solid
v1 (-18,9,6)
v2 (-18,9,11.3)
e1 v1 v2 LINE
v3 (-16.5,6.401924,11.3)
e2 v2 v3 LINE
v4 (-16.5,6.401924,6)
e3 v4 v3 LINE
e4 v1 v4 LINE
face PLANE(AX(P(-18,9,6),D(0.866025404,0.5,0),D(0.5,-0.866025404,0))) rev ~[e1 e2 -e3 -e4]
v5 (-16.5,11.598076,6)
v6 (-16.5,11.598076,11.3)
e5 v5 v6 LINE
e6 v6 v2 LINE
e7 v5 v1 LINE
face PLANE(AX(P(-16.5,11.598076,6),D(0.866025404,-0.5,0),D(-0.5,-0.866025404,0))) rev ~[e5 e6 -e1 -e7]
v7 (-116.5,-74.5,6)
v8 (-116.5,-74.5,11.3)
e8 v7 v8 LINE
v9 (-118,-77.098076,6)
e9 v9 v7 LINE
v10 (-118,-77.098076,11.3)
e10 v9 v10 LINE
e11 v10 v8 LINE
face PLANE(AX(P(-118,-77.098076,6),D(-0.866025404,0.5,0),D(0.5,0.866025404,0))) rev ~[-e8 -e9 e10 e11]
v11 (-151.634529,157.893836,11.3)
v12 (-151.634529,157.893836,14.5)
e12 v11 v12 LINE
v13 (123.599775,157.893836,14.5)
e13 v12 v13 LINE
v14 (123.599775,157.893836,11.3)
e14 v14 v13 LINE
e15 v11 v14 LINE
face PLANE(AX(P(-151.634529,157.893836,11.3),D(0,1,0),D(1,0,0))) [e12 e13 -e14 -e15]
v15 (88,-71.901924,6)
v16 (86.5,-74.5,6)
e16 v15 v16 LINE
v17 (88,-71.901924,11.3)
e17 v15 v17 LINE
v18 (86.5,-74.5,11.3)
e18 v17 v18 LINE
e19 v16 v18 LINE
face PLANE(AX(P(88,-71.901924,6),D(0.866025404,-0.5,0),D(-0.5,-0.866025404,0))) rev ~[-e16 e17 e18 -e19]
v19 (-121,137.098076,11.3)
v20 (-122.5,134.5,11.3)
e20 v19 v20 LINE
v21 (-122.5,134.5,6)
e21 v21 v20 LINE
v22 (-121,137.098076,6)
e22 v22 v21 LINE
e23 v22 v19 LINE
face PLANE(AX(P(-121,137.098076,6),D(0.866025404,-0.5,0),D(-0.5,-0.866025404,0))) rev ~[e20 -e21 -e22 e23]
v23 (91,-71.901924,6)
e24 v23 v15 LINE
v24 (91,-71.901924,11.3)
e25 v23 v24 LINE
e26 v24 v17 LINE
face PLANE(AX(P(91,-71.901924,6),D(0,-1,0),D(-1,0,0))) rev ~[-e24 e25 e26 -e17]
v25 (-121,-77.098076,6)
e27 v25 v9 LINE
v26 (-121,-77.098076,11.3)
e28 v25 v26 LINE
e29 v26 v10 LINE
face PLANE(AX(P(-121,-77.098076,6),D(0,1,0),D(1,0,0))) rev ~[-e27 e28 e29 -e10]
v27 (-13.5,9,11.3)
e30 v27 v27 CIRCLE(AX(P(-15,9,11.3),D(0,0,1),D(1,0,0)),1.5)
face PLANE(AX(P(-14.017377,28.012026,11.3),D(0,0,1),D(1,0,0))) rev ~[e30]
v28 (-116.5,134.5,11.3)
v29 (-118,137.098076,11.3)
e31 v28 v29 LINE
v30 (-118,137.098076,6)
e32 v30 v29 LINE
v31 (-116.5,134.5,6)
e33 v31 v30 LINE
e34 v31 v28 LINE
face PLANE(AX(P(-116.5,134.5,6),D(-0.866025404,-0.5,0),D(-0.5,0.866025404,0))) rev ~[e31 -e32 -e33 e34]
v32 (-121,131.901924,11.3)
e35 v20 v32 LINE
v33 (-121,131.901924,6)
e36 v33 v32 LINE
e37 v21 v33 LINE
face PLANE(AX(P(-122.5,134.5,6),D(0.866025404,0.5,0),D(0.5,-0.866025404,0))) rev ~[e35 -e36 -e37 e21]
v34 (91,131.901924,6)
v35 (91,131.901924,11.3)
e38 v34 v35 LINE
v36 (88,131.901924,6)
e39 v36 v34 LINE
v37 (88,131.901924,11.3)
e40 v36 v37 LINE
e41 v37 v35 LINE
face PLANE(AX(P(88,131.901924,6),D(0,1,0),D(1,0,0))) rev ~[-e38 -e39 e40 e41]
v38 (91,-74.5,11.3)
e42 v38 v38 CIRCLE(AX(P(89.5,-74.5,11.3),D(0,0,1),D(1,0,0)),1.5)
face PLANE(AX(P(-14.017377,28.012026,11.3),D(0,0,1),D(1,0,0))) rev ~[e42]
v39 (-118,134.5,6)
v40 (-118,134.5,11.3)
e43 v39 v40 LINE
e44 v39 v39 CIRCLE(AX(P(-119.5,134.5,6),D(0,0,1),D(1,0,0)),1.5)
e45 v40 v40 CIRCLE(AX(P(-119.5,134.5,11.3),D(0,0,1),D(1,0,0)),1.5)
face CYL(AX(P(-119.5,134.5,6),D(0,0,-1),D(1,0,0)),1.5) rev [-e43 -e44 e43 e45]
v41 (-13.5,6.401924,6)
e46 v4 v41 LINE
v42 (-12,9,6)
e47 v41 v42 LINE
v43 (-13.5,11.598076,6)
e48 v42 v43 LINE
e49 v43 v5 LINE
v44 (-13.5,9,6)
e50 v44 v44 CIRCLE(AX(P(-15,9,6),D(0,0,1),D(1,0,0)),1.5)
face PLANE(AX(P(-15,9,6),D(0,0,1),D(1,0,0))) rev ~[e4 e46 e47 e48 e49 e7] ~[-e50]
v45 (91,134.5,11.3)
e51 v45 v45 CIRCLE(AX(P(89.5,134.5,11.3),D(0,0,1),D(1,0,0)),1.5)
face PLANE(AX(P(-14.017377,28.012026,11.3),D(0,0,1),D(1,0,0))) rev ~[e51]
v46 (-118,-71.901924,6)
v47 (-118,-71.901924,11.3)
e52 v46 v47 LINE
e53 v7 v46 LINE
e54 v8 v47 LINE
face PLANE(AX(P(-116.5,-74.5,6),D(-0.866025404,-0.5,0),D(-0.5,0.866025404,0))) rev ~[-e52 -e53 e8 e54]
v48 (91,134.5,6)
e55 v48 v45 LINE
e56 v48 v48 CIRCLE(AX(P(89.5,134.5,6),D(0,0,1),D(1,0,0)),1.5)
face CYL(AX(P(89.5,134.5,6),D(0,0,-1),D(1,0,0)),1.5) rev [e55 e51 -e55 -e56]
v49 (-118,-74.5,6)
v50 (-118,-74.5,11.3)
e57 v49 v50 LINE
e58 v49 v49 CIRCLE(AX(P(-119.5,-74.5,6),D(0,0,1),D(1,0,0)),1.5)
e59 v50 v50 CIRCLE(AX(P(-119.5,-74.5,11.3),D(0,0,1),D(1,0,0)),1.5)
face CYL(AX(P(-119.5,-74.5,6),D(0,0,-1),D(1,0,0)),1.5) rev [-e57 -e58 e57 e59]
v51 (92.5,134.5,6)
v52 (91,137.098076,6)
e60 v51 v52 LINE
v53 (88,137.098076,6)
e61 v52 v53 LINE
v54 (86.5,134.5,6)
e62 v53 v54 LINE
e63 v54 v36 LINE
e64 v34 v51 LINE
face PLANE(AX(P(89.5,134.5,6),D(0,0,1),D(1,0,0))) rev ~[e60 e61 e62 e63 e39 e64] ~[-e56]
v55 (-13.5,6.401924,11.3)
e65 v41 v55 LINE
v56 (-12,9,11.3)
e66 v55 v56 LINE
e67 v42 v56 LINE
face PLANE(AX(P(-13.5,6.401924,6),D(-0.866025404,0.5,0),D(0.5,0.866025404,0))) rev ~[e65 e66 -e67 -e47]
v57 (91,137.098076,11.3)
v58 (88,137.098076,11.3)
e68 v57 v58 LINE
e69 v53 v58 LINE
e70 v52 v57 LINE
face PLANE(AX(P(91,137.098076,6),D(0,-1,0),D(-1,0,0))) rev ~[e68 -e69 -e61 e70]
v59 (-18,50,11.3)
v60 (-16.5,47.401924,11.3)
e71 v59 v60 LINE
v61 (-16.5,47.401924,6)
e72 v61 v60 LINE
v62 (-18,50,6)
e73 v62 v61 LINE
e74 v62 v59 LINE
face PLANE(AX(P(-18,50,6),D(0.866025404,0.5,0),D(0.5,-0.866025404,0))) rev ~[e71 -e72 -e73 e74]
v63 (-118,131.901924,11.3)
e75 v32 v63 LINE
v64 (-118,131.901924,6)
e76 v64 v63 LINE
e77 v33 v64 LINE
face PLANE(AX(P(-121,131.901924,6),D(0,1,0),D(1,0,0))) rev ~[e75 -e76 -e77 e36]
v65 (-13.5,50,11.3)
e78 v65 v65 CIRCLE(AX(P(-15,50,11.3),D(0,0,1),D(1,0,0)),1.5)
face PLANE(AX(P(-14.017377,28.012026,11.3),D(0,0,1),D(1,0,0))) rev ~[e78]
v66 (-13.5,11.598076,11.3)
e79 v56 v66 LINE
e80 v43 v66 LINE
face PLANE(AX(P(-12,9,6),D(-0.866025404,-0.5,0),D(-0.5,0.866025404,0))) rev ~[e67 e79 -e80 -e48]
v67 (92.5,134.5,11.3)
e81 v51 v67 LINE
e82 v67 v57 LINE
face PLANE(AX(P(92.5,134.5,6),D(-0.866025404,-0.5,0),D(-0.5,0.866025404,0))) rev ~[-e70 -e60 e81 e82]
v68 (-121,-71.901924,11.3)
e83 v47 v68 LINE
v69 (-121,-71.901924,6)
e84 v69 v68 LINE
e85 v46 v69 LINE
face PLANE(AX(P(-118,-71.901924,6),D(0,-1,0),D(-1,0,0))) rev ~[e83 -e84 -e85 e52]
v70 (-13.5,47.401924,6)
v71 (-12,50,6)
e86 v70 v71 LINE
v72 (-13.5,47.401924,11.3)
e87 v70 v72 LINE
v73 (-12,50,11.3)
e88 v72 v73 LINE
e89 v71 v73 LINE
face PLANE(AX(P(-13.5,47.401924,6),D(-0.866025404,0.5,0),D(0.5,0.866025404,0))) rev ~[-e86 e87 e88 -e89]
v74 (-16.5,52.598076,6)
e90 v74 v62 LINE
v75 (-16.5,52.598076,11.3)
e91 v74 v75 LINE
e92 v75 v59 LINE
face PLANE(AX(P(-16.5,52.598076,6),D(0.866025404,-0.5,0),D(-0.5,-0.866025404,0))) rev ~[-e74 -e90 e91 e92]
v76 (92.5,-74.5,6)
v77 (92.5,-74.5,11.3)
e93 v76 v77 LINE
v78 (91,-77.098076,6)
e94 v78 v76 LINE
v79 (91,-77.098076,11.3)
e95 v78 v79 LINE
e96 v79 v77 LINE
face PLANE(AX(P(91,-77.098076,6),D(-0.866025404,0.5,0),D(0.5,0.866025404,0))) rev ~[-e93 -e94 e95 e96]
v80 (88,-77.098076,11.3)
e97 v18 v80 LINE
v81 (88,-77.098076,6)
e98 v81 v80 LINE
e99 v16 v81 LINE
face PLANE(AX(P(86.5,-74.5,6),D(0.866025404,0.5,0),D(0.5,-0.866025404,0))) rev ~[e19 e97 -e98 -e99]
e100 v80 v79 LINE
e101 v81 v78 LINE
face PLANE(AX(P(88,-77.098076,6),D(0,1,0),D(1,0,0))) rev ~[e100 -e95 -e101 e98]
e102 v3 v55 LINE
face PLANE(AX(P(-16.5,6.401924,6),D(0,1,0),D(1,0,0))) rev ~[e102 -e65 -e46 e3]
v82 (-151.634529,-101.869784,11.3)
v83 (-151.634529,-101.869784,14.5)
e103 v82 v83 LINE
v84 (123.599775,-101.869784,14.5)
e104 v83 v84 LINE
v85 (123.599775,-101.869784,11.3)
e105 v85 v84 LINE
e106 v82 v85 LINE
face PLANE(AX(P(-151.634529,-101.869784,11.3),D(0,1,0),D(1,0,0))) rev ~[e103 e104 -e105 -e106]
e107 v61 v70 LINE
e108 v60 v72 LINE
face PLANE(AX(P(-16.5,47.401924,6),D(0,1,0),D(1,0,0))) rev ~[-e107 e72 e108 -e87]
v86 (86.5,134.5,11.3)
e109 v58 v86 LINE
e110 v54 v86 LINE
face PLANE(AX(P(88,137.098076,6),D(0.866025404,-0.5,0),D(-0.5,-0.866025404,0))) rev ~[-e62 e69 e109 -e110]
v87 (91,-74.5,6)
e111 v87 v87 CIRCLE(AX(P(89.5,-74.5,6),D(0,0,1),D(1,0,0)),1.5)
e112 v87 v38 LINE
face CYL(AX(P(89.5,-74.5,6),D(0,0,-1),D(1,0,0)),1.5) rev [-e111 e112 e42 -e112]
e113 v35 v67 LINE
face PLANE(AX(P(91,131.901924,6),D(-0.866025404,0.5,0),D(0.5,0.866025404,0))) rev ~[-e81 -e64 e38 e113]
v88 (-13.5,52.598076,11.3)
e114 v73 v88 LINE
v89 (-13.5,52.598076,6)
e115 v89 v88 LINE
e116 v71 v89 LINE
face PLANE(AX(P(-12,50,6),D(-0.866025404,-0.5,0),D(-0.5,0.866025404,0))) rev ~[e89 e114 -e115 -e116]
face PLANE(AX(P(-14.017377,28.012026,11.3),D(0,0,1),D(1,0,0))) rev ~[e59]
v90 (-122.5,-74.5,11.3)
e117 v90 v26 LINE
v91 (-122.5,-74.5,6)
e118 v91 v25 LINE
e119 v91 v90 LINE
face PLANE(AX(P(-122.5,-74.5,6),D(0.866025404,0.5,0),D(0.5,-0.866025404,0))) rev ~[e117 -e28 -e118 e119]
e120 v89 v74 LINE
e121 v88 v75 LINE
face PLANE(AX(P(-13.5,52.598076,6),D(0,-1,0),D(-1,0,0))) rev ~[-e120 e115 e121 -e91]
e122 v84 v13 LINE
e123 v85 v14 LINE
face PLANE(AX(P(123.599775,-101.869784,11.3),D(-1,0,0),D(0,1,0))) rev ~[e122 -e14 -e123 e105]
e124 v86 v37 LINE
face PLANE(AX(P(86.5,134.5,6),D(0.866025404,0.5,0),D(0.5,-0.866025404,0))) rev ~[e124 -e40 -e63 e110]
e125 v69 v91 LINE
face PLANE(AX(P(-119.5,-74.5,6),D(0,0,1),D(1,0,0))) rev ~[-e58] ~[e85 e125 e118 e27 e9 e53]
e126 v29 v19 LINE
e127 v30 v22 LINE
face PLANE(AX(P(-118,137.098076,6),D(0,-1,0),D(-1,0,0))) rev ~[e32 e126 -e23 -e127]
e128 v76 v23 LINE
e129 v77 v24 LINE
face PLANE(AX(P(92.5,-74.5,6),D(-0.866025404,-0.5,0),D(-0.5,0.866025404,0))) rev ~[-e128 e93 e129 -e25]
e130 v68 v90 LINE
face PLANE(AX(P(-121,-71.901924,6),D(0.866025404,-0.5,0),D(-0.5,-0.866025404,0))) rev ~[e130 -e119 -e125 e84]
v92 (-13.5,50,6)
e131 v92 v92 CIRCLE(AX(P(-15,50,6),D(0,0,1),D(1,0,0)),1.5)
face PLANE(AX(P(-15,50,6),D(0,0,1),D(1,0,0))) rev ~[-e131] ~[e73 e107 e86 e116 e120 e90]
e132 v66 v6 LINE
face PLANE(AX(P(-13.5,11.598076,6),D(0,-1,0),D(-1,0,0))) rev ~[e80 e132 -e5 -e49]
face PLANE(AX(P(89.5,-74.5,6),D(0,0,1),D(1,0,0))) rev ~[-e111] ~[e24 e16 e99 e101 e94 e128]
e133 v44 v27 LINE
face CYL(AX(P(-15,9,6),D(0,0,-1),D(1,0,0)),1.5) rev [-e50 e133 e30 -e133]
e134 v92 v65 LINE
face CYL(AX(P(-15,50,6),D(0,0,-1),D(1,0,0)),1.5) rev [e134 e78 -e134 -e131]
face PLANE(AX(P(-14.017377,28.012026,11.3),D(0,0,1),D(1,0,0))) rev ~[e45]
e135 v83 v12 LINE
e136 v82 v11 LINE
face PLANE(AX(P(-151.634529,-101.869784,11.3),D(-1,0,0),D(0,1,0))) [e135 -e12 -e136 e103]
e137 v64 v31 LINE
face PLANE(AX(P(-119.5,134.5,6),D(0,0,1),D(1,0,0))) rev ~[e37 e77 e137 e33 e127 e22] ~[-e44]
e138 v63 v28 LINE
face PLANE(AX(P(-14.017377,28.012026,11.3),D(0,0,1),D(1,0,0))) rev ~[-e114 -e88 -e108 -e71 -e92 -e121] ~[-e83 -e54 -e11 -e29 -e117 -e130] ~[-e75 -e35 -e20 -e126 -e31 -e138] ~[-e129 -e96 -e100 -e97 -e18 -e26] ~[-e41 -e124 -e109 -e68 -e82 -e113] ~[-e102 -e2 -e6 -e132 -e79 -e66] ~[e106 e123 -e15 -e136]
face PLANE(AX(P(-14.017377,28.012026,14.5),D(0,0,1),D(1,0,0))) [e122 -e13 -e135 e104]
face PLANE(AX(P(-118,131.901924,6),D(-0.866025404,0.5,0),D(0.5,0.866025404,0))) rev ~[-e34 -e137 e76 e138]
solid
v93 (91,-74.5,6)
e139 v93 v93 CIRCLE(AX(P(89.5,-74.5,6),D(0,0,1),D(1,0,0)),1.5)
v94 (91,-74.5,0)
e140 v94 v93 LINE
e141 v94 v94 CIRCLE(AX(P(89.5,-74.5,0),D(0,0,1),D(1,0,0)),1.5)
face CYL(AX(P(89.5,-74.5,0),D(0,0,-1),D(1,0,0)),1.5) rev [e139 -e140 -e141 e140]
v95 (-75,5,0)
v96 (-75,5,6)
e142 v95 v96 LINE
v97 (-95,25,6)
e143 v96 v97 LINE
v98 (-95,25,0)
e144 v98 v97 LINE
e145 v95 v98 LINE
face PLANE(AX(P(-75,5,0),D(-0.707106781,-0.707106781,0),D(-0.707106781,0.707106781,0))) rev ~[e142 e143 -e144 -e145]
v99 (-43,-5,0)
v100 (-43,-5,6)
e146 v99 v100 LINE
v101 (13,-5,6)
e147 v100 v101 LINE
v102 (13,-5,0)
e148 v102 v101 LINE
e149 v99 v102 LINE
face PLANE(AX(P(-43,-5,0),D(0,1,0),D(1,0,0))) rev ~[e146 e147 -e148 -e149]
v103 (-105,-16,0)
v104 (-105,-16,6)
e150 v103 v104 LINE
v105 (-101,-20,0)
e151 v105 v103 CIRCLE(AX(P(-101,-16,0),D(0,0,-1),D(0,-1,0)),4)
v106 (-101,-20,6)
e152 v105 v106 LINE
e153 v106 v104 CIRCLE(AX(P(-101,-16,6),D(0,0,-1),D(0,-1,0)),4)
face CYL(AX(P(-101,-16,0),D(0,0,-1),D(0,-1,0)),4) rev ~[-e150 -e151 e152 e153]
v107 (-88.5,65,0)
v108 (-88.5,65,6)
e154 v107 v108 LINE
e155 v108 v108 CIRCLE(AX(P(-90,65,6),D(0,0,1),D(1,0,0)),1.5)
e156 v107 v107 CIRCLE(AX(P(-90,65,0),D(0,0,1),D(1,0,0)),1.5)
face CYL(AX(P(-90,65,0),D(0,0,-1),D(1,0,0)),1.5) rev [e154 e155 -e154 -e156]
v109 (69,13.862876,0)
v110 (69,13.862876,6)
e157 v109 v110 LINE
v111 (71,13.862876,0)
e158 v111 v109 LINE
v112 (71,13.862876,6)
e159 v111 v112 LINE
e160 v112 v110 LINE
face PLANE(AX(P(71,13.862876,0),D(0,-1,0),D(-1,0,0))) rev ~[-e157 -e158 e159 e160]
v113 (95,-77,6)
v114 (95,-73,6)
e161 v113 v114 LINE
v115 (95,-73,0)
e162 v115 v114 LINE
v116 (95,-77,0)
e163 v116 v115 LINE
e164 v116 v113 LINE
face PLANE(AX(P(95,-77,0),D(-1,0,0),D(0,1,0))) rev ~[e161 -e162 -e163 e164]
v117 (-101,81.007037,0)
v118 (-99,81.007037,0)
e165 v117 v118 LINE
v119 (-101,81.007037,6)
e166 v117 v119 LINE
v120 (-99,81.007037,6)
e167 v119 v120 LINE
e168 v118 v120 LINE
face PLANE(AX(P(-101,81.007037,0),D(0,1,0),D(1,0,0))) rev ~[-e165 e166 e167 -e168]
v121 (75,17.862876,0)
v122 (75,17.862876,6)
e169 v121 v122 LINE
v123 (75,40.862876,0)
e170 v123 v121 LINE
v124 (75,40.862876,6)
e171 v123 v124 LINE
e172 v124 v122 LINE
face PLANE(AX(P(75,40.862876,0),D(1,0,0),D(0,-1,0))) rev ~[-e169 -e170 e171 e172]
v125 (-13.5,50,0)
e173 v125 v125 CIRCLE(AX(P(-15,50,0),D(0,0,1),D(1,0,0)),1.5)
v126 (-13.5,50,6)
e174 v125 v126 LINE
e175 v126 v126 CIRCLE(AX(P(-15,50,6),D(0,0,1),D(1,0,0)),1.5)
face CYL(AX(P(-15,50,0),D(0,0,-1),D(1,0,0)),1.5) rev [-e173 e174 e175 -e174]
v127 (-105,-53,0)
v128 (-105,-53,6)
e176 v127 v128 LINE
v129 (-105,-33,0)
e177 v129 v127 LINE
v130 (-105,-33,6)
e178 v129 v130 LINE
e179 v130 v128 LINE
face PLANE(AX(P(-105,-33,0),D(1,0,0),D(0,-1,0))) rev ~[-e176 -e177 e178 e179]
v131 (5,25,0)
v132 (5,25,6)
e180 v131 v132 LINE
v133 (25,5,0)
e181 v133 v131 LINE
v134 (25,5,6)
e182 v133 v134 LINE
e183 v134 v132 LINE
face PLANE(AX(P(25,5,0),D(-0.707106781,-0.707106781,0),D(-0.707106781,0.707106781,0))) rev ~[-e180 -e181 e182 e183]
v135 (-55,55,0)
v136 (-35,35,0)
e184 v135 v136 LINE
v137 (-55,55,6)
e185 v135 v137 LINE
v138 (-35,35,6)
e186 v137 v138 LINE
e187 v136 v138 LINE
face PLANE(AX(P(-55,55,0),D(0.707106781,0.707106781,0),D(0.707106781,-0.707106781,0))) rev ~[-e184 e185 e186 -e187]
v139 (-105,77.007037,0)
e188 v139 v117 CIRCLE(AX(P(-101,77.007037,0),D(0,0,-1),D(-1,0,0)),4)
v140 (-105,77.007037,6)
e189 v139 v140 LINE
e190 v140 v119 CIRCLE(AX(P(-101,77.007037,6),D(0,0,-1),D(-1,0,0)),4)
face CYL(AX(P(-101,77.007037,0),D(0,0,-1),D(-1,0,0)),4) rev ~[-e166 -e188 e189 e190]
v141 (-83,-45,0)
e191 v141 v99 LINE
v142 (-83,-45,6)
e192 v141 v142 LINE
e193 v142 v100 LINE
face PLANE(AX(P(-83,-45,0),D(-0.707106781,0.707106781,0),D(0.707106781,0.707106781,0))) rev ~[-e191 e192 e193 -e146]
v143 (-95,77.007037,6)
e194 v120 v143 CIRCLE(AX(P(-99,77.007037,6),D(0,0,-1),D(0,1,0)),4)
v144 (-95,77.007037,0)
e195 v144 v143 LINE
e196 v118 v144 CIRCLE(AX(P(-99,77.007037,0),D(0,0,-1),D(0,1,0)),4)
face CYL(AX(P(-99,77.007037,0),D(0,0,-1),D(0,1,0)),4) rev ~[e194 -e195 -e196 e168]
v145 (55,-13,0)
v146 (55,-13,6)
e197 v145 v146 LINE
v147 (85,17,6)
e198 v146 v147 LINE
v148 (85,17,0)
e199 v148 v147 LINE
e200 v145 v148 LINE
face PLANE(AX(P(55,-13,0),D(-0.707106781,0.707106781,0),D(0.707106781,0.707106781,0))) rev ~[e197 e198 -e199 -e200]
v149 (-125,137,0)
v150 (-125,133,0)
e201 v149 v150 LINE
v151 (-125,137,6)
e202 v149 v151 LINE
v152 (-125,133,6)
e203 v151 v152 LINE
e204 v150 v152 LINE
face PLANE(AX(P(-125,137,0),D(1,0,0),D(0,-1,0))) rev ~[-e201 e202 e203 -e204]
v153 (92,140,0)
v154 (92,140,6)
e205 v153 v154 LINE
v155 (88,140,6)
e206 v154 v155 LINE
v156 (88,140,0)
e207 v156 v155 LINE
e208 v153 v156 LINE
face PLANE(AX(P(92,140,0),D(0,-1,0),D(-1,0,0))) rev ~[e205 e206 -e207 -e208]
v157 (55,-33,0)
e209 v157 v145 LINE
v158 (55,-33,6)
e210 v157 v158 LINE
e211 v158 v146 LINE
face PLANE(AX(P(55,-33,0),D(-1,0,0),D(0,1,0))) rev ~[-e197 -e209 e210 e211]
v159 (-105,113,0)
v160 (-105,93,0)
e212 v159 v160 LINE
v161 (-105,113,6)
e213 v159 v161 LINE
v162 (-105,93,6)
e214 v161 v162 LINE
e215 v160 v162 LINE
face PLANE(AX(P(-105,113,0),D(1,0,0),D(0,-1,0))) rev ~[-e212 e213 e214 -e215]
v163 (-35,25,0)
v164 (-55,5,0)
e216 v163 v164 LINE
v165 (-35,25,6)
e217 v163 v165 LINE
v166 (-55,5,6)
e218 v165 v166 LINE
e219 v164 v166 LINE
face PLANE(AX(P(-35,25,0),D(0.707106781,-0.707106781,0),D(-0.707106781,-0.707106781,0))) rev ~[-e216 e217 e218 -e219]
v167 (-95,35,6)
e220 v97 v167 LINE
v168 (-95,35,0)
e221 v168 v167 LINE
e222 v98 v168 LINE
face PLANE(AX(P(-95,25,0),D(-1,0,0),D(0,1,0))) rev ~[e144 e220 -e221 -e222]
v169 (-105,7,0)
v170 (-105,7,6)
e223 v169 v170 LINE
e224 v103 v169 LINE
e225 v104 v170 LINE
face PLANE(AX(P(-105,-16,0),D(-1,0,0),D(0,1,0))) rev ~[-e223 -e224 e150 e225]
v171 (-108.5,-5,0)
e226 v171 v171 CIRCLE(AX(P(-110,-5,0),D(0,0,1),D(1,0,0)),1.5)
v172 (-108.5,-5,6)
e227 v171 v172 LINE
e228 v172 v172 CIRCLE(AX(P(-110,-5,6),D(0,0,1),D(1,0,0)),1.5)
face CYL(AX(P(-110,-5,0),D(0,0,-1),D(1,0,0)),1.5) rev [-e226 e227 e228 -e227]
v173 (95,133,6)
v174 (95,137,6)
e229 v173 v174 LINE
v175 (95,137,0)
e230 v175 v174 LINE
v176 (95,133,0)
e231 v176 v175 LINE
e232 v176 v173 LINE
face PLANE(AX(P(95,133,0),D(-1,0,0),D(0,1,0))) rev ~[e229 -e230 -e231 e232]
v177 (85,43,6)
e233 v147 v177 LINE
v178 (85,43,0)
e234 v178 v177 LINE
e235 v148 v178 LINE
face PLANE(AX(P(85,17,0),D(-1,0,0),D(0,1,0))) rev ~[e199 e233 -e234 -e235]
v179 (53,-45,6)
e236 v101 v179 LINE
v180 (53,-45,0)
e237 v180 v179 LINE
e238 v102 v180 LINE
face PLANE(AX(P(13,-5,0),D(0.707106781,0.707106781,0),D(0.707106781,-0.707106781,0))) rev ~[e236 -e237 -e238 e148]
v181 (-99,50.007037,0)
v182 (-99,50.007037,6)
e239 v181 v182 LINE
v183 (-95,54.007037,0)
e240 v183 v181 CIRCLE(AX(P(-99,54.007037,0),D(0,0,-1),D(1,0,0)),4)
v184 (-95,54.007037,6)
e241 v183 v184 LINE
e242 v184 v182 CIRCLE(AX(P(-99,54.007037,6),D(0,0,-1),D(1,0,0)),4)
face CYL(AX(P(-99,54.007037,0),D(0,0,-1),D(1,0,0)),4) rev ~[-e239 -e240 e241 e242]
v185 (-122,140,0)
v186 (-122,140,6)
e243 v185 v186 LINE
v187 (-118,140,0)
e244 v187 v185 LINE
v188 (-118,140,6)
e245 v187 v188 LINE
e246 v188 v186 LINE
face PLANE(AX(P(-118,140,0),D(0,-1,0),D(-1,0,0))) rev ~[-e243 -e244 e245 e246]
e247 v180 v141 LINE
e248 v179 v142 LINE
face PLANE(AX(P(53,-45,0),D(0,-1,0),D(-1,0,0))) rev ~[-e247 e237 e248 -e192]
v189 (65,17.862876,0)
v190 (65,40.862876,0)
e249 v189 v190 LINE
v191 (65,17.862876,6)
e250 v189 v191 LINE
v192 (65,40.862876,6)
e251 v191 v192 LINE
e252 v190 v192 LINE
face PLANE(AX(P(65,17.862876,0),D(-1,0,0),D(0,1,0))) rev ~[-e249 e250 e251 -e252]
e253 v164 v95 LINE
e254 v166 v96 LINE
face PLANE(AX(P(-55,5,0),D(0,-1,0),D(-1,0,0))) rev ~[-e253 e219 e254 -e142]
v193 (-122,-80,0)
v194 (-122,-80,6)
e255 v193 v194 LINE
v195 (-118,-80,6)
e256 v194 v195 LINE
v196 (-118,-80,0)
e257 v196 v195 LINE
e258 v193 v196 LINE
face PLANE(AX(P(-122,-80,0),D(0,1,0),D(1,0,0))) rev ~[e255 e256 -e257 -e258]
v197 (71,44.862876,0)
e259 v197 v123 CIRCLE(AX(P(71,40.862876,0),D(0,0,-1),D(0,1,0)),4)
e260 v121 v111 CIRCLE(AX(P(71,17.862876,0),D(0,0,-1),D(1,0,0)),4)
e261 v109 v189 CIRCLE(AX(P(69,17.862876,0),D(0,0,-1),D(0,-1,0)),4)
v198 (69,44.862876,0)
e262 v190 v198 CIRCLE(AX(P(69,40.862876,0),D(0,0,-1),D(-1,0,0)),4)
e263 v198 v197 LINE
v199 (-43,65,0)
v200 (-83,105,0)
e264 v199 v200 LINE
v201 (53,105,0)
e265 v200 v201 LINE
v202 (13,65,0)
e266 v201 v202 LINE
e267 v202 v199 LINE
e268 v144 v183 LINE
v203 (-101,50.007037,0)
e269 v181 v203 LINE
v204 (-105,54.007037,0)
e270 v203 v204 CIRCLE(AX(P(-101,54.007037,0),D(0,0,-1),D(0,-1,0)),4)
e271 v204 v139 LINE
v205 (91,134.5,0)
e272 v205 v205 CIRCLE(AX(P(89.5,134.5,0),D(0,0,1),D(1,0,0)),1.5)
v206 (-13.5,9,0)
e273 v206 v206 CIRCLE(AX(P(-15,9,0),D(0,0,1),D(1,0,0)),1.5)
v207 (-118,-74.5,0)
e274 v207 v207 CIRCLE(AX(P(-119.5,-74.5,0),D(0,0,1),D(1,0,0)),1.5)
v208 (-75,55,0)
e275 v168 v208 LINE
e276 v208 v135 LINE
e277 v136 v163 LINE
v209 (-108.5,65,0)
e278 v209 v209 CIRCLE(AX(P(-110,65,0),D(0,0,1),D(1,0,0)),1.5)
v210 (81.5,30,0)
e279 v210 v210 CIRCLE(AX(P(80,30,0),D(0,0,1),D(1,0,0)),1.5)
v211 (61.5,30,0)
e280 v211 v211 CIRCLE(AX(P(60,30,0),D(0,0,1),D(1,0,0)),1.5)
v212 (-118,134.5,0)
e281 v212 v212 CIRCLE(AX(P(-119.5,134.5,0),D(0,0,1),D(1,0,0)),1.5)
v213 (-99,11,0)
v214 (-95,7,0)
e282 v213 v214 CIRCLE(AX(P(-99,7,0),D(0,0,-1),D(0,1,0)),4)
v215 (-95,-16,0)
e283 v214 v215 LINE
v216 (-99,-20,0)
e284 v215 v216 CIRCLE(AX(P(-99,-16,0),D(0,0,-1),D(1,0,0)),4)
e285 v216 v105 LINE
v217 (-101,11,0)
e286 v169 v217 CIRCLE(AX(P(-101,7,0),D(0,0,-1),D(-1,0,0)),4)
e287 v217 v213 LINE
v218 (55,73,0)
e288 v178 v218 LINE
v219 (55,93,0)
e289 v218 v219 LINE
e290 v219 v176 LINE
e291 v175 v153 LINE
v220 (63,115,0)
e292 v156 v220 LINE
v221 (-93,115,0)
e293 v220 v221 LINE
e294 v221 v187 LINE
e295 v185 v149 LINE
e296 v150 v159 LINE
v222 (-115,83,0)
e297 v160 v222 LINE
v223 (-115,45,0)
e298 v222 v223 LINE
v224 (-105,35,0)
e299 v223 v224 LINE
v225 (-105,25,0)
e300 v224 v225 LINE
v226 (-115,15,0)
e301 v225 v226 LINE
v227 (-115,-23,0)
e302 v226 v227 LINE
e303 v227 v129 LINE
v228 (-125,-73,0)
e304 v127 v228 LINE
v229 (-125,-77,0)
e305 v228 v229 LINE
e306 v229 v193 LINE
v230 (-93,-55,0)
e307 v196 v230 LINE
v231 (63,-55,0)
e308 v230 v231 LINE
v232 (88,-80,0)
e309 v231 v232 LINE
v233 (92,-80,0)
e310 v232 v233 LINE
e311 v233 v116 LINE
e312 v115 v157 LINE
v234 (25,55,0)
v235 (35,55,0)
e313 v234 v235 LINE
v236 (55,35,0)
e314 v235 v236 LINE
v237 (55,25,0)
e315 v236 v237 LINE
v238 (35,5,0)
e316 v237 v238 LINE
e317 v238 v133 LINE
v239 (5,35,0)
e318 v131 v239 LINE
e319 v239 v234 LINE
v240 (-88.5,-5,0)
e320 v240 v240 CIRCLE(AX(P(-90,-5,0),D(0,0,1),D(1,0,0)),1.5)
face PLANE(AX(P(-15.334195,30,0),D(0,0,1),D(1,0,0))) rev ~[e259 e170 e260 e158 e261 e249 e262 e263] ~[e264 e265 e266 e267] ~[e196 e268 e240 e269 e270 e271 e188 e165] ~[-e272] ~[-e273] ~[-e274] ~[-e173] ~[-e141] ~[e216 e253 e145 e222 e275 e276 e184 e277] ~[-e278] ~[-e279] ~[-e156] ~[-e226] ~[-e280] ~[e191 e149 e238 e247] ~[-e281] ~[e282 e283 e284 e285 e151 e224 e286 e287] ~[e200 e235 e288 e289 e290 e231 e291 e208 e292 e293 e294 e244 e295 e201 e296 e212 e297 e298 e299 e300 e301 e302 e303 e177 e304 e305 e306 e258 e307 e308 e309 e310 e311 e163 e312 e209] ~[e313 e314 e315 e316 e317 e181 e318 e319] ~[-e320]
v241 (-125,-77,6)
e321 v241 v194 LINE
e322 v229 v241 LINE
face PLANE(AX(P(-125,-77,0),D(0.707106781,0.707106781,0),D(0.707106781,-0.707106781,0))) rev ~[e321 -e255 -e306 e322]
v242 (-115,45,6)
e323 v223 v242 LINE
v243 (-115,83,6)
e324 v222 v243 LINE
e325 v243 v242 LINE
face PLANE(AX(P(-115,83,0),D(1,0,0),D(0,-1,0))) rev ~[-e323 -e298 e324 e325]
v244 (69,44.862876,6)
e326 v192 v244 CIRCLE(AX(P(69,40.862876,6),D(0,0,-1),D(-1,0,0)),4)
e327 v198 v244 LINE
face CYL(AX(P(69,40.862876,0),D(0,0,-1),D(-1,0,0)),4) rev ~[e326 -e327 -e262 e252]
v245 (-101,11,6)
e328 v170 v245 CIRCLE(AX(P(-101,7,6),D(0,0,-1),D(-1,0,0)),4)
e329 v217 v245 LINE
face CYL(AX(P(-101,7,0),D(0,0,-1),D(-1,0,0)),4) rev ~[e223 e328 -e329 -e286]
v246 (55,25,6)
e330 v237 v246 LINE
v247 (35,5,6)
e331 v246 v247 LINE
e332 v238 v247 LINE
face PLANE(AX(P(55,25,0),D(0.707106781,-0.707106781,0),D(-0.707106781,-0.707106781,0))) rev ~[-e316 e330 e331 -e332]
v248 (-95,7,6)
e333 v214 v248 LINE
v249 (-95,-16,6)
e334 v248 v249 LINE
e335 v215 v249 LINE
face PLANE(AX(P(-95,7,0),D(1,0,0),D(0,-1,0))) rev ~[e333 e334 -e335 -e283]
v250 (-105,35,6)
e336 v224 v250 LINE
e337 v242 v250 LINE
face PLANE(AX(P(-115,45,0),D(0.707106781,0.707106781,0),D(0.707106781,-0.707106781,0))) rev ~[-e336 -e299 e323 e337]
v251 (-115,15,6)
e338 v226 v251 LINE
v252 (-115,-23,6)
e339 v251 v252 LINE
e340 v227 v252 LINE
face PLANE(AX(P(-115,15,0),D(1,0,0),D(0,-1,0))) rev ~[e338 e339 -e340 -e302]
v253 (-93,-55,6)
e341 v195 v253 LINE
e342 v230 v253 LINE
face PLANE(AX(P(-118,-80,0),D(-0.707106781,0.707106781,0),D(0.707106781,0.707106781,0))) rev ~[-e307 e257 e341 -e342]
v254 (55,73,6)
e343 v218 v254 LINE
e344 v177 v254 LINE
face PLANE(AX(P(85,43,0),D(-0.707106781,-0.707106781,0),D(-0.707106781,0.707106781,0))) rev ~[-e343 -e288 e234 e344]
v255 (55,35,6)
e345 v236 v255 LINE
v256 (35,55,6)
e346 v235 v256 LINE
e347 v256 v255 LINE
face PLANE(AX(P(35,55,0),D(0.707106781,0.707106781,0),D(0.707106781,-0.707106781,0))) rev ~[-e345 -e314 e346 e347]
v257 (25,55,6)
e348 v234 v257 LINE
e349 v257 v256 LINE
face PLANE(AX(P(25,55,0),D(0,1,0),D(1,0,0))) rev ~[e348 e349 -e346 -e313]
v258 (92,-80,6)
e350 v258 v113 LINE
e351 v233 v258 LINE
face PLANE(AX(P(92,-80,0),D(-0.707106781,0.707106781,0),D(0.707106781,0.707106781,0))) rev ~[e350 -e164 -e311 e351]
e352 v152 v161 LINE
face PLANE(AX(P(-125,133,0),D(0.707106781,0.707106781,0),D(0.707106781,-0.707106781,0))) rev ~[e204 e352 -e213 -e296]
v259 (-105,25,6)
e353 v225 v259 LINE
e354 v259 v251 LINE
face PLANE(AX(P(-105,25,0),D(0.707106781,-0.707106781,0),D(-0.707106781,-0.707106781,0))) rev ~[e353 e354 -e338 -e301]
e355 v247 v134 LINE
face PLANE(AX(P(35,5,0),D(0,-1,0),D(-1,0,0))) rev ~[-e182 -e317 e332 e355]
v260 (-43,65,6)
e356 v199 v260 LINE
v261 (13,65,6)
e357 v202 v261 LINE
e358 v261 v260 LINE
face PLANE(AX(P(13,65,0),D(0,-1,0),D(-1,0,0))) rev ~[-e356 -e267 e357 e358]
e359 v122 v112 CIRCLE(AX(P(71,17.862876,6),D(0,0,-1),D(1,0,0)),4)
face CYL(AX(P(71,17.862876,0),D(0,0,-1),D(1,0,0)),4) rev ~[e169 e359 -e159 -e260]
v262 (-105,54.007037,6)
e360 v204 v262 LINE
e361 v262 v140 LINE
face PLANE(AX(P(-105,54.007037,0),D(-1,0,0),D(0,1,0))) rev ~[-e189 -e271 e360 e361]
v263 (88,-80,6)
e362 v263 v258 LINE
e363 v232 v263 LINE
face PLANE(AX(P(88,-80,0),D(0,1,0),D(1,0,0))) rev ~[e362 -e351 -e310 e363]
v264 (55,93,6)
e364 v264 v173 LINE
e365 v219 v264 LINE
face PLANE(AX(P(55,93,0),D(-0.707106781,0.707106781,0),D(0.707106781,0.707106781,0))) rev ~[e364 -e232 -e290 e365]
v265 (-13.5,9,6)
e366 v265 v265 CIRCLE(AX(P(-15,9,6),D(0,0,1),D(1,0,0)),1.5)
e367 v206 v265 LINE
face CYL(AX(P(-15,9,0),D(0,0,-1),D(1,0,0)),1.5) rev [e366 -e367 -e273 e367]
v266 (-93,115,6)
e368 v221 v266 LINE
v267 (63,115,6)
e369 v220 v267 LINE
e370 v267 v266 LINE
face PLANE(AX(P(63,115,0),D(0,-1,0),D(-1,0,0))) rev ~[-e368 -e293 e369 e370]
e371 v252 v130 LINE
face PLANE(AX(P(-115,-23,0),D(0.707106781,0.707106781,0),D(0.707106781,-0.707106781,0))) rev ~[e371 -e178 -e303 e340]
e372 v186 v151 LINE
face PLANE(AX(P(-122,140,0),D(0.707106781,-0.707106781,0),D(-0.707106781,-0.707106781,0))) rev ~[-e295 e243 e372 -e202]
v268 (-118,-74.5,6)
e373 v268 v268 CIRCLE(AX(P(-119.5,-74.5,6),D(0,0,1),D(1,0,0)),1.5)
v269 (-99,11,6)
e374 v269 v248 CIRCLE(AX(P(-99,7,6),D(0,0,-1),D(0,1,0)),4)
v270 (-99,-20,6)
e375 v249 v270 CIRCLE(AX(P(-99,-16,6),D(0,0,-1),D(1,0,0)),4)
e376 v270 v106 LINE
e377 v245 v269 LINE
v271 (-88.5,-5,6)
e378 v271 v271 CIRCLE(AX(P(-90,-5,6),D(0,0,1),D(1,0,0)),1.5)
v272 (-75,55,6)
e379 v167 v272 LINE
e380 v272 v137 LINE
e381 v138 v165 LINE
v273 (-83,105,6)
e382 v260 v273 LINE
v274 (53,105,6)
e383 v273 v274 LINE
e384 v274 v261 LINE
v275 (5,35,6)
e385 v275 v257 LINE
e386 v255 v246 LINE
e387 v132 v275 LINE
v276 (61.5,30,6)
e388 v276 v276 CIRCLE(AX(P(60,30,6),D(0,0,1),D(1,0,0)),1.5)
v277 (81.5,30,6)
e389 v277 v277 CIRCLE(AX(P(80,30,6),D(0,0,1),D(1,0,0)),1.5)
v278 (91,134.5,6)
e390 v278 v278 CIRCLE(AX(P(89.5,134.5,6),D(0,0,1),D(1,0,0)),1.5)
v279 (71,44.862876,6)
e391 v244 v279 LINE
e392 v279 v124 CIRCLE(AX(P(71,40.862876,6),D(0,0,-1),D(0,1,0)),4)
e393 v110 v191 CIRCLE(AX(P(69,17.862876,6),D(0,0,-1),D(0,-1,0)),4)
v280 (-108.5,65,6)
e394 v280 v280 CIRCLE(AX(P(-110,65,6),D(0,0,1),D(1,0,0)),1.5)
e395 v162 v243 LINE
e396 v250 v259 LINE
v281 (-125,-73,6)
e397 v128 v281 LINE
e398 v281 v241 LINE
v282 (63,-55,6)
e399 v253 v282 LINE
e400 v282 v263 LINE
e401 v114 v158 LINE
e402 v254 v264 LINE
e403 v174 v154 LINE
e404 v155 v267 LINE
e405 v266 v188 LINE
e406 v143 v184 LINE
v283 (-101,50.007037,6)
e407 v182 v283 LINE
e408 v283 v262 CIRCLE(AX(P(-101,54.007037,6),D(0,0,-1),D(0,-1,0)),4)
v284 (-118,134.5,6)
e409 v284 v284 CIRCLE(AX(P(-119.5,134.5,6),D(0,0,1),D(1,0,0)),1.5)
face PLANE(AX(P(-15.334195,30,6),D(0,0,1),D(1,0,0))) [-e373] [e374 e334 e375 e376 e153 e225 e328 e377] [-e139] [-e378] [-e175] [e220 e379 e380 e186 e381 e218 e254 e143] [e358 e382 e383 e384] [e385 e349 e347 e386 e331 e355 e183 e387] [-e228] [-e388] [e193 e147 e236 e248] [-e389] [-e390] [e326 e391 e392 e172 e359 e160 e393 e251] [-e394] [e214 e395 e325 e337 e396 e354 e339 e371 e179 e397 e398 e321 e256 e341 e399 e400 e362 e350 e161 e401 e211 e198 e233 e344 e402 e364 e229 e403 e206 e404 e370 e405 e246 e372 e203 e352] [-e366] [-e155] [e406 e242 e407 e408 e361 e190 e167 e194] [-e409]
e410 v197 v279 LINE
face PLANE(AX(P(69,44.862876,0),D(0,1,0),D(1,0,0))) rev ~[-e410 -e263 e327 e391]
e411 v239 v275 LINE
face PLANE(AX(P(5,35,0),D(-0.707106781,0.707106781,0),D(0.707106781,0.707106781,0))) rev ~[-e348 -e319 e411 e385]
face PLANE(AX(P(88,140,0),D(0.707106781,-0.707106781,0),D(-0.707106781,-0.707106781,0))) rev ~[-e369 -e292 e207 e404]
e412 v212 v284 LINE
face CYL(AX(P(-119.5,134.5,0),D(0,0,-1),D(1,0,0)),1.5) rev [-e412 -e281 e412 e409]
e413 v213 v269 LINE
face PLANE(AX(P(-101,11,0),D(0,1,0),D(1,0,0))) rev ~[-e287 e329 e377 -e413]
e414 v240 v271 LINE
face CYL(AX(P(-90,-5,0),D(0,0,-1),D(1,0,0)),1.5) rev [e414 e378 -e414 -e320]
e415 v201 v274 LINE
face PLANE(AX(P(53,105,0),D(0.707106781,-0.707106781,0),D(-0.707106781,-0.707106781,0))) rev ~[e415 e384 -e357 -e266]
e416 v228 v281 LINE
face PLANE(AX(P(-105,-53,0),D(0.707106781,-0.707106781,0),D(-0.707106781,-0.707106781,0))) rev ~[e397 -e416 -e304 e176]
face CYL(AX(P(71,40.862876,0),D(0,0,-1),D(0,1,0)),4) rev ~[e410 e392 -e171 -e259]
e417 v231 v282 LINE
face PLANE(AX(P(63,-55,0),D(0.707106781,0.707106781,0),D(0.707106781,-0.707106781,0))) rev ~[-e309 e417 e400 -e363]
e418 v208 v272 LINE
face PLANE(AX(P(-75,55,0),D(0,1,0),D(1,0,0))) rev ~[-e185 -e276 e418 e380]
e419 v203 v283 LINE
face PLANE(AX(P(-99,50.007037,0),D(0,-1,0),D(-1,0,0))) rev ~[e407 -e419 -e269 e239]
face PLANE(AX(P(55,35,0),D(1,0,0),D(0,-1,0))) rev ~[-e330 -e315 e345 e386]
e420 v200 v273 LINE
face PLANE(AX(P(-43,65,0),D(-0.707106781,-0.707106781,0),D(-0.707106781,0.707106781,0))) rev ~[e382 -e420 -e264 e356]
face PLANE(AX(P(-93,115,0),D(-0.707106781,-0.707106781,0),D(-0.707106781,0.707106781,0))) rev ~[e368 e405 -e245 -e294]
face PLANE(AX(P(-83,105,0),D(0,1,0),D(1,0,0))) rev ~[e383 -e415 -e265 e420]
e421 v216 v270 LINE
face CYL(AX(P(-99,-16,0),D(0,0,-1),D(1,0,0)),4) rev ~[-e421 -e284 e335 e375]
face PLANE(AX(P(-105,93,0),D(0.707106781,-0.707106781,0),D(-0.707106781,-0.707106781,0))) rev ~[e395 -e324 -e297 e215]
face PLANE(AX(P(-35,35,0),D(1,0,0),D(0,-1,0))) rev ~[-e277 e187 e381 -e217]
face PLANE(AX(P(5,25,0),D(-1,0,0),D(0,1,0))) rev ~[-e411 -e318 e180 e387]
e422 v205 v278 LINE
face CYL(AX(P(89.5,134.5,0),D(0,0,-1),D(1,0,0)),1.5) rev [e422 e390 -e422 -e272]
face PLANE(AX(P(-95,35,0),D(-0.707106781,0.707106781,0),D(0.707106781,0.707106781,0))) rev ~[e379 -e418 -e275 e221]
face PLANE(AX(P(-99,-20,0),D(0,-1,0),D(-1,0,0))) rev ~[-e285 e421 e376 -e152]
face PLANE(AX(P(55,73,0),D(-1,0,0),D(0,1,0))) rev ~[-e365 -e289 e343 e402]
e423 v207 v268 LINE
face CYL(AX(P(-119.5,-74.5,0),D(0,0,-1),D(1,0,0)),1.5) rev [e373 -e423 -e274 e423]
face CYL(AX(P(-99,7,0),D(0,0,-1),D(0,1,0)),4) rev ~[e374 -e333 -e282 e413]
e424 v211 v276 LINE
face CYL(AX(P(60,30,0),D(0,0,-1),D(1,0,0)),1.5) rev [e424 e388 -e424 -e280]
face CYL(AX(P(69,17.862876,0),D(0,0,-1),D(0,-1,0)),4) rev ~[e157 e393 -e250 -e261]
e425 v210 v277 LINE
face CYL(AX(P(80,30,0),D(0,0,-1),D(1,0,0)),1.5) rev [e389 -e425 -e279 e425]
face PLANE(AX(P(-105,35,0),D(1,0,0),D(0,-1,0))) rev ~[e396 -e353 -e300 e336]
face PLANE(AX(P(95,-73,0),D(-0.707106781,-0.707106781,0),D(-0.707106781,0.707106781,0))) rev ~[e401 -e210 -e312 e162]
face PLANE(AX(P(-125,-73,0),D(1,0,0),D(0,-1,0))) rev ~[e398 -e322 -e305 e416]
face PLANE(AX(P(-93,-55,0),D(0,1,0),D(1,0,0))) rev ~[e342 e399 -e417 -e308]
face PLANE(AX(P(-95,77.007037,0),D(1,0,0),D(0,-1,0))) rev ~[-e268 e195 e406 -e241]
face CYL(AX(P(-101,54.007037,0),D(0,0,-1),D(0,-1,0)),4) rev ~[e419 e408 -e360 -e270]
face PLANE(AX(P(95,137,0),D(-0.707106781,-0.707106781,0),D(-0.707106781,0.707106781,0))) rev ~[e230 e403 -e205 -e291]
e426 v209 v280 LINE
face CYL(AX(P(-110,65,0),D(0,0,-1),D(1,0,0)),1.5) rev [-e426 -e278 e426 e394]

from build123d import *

# Parameters (mm, degrees)
F0_R     = 1.5
F1_DEPTH = 6
F2_R     = 1.5
F3_DEPTH = 5.3
F4_W     = 275.2343043685
F4_H     = 259.7636207938
F4_R     = 1.5
F5_DEPTH = 3.2
F6_DEPTH = 5.3


with BuildPart() as f1:
    # F0 (on Top) → F1 (new body)
    with BuildSketch(Plane.XY):
        Polygon((-118, 140), (-120, 140), (-122, 140), (-125, 137), (-125, 135), (-125, 133), (-105, 113), (-105, 93), (-115, 83), (-115, 45), (-105, 35), (-105, 25), (-115, 15), (-115, -23), (-105, -33), (-105, -53), (-125, -73), (-125, -77), (-122, -80), (-120, -80), (-118, -80), (-93, -55), (63, -55), (88, -80), (90, -80), (92, -80), (95, -77), (95, -73), (75, -53), (55, -33), (55, -13), (75, 7), (85, 17), (85, 43), (75, 53), (55, 73), (55, 93), (95, 133), (95, 136), (95, 137), (92, 140), (88, 140), (65, 117), (63, 115), (-93, 115), align=None)
        with Locations((-119.5, -74.5)):
            Circle(F0_R, mode=Mode.SUBTRACT)
        with Locations((-110, -5)):
            Circle(F0_R, mode=Mode.SUBTRACT)
        with BuildLine():
            ThreePointArc((-101, -20), (-103.8284271247, -18.8284271247), (-105, -16))
            Line((-105, -16), (-105, 7))
            ThreePointArc((-105, 7), (-103.8284271247, 9.8284271247), (-101, 11))
            Line((-101, 11), (-99, 11))
            ThreePointArc((-99, 11), (-96.1715728753, 9.8284271247), (-95, 7))
            Line((-95, 7), (-95, -16))
            ThreePointArc((-95, -16), (-96.1715728753, -18.8284271247), (-99, -20))
            Line((-99, -20), (-101, -20))
        make_face(mode=Mode.SUBTRACT)
        with Locations((-90, -5)):
            Circle(F0_R, mode=Mode.SUBTRACT)
        with Locations((89.5, -74.5)):
            Circle(F0_R, mode=Mode.SUBTRACT)
        Polygon((-43, -5), (13, -5), (53, -45), (-83, -45), align=None, mode=Mode.SUBTRACT)
        with Locations((-15, 9)):
            Circle(F0_R, mode=Mode.SUBTRACT)
        with BuildLine():
            ThreePointArc((75, 17.862876), (73.8284271247, 15.0344488753), (71, 13.862876))
            Line((71, 13.862876), (69, 13.862876))
            ThreePointArc((69, 13.862876), (66.1715728753, 15.0344488753), (65, 17.862876))
            Line((65, 17.862876), (65, 40.862876))
            ThreePointArc((65, 40.862876), (66.1715728753, 43.6913031247), (69, 44.862876))
            Line((69, 44.862876), (71, 44.862876))
            ThreePointArc((71, 44.862876), (73.8284271247, 43.6913031247), (75, 40.862876))
            Line((75, 40.862876), (75, 17.862876))
        make_face(mode=Mode.SUBTRACT)
        with Locations((-110, 65)):
            Circle(F0_R, mode=Mode.SUBTRACT)
        with BuildLine():
            ThreePointArc((-95, 54.007037), (-96.1715728753, 51.1786098753), (-99, 50.007037))
            Line((-99, 50.007037), (-101, 50.007037))
            ThreePointArc((-101, 50.007037), (-103.8284271247, 51.1786098753), (-105, 54.007037))
            Line((-105, 54.007037), (-105, 77.007037))
            ThreePointArc((-105, 77.007037), (-103.8284271247, 79.8354641247), (-101, 81.007037))
            Line((-101, 81.007037), (-99, 81.007037))
            ThreePointArc((-99, 81.007037), (-96.1715728753, 79.8354641247), (-95, 77.007037))
            Line((-95, 77.007037), (-95, 54.007037))
        make_face(mode=Mode.SUBTRACT)
        with Locations((-90, 65)):
            Circle(F0_R, mode=Mode.SUBTRACT)
        Polygon((-95, 25), (-95, 35), (-75, 55), (-55, 55), (-35, 35), (-35, 25), (-55, 5), (-75, 5), align=None, mode=Mode.SUBTRACT)
        with Locations((-119.5, 134.5)):
            Circle(F0_R, mode=Mode.SUBTRACT)
        with Locations((-15, 50)):
            Circle(F0_R, mode=Mode.SUBTRACT)
        Polygon((25, 55), (35, 55), (55, 35), (55, 25), (35, 5), (25, 5), (5, 25), (5, 35), align=None, mode=Mode.SUBTRACT)
        with Locations((60, 30)):
            Circle(F0_R, mode=Mode.SUBTRACT)
        with Locations((80, 30)):
            Circle(F0_R, mode=Mode.SUBTRACT)
        Polygon((53, 105), (25, 77), (23, 75), (13, 65), (-43, 65), (-83, 105), align=None, mode=Mode.SUBTRACT)
        with Locations((89.5, 134.5)):
            Circle(F0_R, mode=Mode.SUBTRACT)
    extrude(amount=F1_DEPTH)


with BuildPart() as f3:
    # F2 (on face) → F3 (new body)
    with BuildSketch(Plane.XY.offset(6)):
        Polygon((-118, 131.9019237886), (-116.5, 134.5), (-118, 137.0980762114), (-121, 137.0980762114), (-122.5, 134.5), (-121, 131.9019237886), align=None)
        with Locations((-119.5, 134.5)):
            Circle(F2_R, mode=Mode.SUBTRACT)
    extrude(amount=F3_DEPTH)

    # F4 (on face) → F5 (join)
    with BuildSketch(Plane.XY.offset(11.3)):
        with Locations((-14.0173770487, 28.0120261014)):
            Rectangle(F4_W, F4_H)
        Polygon((-116.5, 134.5), (-118, 131.9019237886), (-121, 131.9019237886), (-122.5, 134.5), (-121, 137.0980762114), (-118, 137.0980762114), align=None, mode=Mode.SUBTRACT)
        Polygon((-121, 131.9019237886), (-118, 131.9019237886), (-116.5, 134.5), (-118, 137.0980762114), (-121, 137.0980762114), (-122.5, 134.5), align=None)
        with Locations((-119.5, 134.5)):
            Circle(F4_R, mode=Mode.SUBTRACT)
        with Locations((-119.5, 134.5)):
            Circle(F4_R)
    extrude(amount=F5_DEPTH)

    # F2 (on face) → F6 (join, through all)
    with BuildSketch(Plane.XY.offset(6)):
        Polygon((-118, -77.0980762114), (-116.5, -74.5), (-118, -71.9019237886), (-121, -71.9019237886), (-122.5, -74.5), (-121, -77.0980762114), align=None)
        with Locations((-119.5, -74.5)):
            Circle(F2_R, mode=Mode.SUBTRACT)
        Polygon((-13.5, 6.4019237886), (-12, 9), (-13.5, 11.5980762114), (-16.5, 11.5980762114), (-18, 9), (-16.5, 6.4019237886), align=None)
        with Locations((-15, 9)):
            Circle(F2_R, mode=Mode.SUBTRACT)
        Polygon((-13.5, 47.4019237886), (-12, 50), (-13.5, 52.5980762114), (-16.5, 52.5980762114), (-18, 50), (-16.5, 47.4019237886), align=None)
        with Locations((-15, 50)):
            Circle(F2_R, mode=Mode.SUBTRACT)
        Polygon((88, 137.0980762114), (86.5, 134.5), (88, 131.9019237886), (91, 131.9019237886), (92.5, 134.5), (91, 137.0980762114), align=None)
        with Locations((89.5, 134.5)):
            Circle(F2_R, mode=Mode.SUBTRACT)
        Polygon((91, -77.0980762114), (92.5, -74.5), (91, -71.9019237886), (88, -71.9019237886), (86.5, -74.5), (88, -77.0980762114), align=None)
        with Locations((89.5, -74.5)):
            Circle(F2_R, mode=Mode.SUBTRACT)
    extrude(amount=F6_DEPTH)


solid = Compound([f1.part, f3.part])
